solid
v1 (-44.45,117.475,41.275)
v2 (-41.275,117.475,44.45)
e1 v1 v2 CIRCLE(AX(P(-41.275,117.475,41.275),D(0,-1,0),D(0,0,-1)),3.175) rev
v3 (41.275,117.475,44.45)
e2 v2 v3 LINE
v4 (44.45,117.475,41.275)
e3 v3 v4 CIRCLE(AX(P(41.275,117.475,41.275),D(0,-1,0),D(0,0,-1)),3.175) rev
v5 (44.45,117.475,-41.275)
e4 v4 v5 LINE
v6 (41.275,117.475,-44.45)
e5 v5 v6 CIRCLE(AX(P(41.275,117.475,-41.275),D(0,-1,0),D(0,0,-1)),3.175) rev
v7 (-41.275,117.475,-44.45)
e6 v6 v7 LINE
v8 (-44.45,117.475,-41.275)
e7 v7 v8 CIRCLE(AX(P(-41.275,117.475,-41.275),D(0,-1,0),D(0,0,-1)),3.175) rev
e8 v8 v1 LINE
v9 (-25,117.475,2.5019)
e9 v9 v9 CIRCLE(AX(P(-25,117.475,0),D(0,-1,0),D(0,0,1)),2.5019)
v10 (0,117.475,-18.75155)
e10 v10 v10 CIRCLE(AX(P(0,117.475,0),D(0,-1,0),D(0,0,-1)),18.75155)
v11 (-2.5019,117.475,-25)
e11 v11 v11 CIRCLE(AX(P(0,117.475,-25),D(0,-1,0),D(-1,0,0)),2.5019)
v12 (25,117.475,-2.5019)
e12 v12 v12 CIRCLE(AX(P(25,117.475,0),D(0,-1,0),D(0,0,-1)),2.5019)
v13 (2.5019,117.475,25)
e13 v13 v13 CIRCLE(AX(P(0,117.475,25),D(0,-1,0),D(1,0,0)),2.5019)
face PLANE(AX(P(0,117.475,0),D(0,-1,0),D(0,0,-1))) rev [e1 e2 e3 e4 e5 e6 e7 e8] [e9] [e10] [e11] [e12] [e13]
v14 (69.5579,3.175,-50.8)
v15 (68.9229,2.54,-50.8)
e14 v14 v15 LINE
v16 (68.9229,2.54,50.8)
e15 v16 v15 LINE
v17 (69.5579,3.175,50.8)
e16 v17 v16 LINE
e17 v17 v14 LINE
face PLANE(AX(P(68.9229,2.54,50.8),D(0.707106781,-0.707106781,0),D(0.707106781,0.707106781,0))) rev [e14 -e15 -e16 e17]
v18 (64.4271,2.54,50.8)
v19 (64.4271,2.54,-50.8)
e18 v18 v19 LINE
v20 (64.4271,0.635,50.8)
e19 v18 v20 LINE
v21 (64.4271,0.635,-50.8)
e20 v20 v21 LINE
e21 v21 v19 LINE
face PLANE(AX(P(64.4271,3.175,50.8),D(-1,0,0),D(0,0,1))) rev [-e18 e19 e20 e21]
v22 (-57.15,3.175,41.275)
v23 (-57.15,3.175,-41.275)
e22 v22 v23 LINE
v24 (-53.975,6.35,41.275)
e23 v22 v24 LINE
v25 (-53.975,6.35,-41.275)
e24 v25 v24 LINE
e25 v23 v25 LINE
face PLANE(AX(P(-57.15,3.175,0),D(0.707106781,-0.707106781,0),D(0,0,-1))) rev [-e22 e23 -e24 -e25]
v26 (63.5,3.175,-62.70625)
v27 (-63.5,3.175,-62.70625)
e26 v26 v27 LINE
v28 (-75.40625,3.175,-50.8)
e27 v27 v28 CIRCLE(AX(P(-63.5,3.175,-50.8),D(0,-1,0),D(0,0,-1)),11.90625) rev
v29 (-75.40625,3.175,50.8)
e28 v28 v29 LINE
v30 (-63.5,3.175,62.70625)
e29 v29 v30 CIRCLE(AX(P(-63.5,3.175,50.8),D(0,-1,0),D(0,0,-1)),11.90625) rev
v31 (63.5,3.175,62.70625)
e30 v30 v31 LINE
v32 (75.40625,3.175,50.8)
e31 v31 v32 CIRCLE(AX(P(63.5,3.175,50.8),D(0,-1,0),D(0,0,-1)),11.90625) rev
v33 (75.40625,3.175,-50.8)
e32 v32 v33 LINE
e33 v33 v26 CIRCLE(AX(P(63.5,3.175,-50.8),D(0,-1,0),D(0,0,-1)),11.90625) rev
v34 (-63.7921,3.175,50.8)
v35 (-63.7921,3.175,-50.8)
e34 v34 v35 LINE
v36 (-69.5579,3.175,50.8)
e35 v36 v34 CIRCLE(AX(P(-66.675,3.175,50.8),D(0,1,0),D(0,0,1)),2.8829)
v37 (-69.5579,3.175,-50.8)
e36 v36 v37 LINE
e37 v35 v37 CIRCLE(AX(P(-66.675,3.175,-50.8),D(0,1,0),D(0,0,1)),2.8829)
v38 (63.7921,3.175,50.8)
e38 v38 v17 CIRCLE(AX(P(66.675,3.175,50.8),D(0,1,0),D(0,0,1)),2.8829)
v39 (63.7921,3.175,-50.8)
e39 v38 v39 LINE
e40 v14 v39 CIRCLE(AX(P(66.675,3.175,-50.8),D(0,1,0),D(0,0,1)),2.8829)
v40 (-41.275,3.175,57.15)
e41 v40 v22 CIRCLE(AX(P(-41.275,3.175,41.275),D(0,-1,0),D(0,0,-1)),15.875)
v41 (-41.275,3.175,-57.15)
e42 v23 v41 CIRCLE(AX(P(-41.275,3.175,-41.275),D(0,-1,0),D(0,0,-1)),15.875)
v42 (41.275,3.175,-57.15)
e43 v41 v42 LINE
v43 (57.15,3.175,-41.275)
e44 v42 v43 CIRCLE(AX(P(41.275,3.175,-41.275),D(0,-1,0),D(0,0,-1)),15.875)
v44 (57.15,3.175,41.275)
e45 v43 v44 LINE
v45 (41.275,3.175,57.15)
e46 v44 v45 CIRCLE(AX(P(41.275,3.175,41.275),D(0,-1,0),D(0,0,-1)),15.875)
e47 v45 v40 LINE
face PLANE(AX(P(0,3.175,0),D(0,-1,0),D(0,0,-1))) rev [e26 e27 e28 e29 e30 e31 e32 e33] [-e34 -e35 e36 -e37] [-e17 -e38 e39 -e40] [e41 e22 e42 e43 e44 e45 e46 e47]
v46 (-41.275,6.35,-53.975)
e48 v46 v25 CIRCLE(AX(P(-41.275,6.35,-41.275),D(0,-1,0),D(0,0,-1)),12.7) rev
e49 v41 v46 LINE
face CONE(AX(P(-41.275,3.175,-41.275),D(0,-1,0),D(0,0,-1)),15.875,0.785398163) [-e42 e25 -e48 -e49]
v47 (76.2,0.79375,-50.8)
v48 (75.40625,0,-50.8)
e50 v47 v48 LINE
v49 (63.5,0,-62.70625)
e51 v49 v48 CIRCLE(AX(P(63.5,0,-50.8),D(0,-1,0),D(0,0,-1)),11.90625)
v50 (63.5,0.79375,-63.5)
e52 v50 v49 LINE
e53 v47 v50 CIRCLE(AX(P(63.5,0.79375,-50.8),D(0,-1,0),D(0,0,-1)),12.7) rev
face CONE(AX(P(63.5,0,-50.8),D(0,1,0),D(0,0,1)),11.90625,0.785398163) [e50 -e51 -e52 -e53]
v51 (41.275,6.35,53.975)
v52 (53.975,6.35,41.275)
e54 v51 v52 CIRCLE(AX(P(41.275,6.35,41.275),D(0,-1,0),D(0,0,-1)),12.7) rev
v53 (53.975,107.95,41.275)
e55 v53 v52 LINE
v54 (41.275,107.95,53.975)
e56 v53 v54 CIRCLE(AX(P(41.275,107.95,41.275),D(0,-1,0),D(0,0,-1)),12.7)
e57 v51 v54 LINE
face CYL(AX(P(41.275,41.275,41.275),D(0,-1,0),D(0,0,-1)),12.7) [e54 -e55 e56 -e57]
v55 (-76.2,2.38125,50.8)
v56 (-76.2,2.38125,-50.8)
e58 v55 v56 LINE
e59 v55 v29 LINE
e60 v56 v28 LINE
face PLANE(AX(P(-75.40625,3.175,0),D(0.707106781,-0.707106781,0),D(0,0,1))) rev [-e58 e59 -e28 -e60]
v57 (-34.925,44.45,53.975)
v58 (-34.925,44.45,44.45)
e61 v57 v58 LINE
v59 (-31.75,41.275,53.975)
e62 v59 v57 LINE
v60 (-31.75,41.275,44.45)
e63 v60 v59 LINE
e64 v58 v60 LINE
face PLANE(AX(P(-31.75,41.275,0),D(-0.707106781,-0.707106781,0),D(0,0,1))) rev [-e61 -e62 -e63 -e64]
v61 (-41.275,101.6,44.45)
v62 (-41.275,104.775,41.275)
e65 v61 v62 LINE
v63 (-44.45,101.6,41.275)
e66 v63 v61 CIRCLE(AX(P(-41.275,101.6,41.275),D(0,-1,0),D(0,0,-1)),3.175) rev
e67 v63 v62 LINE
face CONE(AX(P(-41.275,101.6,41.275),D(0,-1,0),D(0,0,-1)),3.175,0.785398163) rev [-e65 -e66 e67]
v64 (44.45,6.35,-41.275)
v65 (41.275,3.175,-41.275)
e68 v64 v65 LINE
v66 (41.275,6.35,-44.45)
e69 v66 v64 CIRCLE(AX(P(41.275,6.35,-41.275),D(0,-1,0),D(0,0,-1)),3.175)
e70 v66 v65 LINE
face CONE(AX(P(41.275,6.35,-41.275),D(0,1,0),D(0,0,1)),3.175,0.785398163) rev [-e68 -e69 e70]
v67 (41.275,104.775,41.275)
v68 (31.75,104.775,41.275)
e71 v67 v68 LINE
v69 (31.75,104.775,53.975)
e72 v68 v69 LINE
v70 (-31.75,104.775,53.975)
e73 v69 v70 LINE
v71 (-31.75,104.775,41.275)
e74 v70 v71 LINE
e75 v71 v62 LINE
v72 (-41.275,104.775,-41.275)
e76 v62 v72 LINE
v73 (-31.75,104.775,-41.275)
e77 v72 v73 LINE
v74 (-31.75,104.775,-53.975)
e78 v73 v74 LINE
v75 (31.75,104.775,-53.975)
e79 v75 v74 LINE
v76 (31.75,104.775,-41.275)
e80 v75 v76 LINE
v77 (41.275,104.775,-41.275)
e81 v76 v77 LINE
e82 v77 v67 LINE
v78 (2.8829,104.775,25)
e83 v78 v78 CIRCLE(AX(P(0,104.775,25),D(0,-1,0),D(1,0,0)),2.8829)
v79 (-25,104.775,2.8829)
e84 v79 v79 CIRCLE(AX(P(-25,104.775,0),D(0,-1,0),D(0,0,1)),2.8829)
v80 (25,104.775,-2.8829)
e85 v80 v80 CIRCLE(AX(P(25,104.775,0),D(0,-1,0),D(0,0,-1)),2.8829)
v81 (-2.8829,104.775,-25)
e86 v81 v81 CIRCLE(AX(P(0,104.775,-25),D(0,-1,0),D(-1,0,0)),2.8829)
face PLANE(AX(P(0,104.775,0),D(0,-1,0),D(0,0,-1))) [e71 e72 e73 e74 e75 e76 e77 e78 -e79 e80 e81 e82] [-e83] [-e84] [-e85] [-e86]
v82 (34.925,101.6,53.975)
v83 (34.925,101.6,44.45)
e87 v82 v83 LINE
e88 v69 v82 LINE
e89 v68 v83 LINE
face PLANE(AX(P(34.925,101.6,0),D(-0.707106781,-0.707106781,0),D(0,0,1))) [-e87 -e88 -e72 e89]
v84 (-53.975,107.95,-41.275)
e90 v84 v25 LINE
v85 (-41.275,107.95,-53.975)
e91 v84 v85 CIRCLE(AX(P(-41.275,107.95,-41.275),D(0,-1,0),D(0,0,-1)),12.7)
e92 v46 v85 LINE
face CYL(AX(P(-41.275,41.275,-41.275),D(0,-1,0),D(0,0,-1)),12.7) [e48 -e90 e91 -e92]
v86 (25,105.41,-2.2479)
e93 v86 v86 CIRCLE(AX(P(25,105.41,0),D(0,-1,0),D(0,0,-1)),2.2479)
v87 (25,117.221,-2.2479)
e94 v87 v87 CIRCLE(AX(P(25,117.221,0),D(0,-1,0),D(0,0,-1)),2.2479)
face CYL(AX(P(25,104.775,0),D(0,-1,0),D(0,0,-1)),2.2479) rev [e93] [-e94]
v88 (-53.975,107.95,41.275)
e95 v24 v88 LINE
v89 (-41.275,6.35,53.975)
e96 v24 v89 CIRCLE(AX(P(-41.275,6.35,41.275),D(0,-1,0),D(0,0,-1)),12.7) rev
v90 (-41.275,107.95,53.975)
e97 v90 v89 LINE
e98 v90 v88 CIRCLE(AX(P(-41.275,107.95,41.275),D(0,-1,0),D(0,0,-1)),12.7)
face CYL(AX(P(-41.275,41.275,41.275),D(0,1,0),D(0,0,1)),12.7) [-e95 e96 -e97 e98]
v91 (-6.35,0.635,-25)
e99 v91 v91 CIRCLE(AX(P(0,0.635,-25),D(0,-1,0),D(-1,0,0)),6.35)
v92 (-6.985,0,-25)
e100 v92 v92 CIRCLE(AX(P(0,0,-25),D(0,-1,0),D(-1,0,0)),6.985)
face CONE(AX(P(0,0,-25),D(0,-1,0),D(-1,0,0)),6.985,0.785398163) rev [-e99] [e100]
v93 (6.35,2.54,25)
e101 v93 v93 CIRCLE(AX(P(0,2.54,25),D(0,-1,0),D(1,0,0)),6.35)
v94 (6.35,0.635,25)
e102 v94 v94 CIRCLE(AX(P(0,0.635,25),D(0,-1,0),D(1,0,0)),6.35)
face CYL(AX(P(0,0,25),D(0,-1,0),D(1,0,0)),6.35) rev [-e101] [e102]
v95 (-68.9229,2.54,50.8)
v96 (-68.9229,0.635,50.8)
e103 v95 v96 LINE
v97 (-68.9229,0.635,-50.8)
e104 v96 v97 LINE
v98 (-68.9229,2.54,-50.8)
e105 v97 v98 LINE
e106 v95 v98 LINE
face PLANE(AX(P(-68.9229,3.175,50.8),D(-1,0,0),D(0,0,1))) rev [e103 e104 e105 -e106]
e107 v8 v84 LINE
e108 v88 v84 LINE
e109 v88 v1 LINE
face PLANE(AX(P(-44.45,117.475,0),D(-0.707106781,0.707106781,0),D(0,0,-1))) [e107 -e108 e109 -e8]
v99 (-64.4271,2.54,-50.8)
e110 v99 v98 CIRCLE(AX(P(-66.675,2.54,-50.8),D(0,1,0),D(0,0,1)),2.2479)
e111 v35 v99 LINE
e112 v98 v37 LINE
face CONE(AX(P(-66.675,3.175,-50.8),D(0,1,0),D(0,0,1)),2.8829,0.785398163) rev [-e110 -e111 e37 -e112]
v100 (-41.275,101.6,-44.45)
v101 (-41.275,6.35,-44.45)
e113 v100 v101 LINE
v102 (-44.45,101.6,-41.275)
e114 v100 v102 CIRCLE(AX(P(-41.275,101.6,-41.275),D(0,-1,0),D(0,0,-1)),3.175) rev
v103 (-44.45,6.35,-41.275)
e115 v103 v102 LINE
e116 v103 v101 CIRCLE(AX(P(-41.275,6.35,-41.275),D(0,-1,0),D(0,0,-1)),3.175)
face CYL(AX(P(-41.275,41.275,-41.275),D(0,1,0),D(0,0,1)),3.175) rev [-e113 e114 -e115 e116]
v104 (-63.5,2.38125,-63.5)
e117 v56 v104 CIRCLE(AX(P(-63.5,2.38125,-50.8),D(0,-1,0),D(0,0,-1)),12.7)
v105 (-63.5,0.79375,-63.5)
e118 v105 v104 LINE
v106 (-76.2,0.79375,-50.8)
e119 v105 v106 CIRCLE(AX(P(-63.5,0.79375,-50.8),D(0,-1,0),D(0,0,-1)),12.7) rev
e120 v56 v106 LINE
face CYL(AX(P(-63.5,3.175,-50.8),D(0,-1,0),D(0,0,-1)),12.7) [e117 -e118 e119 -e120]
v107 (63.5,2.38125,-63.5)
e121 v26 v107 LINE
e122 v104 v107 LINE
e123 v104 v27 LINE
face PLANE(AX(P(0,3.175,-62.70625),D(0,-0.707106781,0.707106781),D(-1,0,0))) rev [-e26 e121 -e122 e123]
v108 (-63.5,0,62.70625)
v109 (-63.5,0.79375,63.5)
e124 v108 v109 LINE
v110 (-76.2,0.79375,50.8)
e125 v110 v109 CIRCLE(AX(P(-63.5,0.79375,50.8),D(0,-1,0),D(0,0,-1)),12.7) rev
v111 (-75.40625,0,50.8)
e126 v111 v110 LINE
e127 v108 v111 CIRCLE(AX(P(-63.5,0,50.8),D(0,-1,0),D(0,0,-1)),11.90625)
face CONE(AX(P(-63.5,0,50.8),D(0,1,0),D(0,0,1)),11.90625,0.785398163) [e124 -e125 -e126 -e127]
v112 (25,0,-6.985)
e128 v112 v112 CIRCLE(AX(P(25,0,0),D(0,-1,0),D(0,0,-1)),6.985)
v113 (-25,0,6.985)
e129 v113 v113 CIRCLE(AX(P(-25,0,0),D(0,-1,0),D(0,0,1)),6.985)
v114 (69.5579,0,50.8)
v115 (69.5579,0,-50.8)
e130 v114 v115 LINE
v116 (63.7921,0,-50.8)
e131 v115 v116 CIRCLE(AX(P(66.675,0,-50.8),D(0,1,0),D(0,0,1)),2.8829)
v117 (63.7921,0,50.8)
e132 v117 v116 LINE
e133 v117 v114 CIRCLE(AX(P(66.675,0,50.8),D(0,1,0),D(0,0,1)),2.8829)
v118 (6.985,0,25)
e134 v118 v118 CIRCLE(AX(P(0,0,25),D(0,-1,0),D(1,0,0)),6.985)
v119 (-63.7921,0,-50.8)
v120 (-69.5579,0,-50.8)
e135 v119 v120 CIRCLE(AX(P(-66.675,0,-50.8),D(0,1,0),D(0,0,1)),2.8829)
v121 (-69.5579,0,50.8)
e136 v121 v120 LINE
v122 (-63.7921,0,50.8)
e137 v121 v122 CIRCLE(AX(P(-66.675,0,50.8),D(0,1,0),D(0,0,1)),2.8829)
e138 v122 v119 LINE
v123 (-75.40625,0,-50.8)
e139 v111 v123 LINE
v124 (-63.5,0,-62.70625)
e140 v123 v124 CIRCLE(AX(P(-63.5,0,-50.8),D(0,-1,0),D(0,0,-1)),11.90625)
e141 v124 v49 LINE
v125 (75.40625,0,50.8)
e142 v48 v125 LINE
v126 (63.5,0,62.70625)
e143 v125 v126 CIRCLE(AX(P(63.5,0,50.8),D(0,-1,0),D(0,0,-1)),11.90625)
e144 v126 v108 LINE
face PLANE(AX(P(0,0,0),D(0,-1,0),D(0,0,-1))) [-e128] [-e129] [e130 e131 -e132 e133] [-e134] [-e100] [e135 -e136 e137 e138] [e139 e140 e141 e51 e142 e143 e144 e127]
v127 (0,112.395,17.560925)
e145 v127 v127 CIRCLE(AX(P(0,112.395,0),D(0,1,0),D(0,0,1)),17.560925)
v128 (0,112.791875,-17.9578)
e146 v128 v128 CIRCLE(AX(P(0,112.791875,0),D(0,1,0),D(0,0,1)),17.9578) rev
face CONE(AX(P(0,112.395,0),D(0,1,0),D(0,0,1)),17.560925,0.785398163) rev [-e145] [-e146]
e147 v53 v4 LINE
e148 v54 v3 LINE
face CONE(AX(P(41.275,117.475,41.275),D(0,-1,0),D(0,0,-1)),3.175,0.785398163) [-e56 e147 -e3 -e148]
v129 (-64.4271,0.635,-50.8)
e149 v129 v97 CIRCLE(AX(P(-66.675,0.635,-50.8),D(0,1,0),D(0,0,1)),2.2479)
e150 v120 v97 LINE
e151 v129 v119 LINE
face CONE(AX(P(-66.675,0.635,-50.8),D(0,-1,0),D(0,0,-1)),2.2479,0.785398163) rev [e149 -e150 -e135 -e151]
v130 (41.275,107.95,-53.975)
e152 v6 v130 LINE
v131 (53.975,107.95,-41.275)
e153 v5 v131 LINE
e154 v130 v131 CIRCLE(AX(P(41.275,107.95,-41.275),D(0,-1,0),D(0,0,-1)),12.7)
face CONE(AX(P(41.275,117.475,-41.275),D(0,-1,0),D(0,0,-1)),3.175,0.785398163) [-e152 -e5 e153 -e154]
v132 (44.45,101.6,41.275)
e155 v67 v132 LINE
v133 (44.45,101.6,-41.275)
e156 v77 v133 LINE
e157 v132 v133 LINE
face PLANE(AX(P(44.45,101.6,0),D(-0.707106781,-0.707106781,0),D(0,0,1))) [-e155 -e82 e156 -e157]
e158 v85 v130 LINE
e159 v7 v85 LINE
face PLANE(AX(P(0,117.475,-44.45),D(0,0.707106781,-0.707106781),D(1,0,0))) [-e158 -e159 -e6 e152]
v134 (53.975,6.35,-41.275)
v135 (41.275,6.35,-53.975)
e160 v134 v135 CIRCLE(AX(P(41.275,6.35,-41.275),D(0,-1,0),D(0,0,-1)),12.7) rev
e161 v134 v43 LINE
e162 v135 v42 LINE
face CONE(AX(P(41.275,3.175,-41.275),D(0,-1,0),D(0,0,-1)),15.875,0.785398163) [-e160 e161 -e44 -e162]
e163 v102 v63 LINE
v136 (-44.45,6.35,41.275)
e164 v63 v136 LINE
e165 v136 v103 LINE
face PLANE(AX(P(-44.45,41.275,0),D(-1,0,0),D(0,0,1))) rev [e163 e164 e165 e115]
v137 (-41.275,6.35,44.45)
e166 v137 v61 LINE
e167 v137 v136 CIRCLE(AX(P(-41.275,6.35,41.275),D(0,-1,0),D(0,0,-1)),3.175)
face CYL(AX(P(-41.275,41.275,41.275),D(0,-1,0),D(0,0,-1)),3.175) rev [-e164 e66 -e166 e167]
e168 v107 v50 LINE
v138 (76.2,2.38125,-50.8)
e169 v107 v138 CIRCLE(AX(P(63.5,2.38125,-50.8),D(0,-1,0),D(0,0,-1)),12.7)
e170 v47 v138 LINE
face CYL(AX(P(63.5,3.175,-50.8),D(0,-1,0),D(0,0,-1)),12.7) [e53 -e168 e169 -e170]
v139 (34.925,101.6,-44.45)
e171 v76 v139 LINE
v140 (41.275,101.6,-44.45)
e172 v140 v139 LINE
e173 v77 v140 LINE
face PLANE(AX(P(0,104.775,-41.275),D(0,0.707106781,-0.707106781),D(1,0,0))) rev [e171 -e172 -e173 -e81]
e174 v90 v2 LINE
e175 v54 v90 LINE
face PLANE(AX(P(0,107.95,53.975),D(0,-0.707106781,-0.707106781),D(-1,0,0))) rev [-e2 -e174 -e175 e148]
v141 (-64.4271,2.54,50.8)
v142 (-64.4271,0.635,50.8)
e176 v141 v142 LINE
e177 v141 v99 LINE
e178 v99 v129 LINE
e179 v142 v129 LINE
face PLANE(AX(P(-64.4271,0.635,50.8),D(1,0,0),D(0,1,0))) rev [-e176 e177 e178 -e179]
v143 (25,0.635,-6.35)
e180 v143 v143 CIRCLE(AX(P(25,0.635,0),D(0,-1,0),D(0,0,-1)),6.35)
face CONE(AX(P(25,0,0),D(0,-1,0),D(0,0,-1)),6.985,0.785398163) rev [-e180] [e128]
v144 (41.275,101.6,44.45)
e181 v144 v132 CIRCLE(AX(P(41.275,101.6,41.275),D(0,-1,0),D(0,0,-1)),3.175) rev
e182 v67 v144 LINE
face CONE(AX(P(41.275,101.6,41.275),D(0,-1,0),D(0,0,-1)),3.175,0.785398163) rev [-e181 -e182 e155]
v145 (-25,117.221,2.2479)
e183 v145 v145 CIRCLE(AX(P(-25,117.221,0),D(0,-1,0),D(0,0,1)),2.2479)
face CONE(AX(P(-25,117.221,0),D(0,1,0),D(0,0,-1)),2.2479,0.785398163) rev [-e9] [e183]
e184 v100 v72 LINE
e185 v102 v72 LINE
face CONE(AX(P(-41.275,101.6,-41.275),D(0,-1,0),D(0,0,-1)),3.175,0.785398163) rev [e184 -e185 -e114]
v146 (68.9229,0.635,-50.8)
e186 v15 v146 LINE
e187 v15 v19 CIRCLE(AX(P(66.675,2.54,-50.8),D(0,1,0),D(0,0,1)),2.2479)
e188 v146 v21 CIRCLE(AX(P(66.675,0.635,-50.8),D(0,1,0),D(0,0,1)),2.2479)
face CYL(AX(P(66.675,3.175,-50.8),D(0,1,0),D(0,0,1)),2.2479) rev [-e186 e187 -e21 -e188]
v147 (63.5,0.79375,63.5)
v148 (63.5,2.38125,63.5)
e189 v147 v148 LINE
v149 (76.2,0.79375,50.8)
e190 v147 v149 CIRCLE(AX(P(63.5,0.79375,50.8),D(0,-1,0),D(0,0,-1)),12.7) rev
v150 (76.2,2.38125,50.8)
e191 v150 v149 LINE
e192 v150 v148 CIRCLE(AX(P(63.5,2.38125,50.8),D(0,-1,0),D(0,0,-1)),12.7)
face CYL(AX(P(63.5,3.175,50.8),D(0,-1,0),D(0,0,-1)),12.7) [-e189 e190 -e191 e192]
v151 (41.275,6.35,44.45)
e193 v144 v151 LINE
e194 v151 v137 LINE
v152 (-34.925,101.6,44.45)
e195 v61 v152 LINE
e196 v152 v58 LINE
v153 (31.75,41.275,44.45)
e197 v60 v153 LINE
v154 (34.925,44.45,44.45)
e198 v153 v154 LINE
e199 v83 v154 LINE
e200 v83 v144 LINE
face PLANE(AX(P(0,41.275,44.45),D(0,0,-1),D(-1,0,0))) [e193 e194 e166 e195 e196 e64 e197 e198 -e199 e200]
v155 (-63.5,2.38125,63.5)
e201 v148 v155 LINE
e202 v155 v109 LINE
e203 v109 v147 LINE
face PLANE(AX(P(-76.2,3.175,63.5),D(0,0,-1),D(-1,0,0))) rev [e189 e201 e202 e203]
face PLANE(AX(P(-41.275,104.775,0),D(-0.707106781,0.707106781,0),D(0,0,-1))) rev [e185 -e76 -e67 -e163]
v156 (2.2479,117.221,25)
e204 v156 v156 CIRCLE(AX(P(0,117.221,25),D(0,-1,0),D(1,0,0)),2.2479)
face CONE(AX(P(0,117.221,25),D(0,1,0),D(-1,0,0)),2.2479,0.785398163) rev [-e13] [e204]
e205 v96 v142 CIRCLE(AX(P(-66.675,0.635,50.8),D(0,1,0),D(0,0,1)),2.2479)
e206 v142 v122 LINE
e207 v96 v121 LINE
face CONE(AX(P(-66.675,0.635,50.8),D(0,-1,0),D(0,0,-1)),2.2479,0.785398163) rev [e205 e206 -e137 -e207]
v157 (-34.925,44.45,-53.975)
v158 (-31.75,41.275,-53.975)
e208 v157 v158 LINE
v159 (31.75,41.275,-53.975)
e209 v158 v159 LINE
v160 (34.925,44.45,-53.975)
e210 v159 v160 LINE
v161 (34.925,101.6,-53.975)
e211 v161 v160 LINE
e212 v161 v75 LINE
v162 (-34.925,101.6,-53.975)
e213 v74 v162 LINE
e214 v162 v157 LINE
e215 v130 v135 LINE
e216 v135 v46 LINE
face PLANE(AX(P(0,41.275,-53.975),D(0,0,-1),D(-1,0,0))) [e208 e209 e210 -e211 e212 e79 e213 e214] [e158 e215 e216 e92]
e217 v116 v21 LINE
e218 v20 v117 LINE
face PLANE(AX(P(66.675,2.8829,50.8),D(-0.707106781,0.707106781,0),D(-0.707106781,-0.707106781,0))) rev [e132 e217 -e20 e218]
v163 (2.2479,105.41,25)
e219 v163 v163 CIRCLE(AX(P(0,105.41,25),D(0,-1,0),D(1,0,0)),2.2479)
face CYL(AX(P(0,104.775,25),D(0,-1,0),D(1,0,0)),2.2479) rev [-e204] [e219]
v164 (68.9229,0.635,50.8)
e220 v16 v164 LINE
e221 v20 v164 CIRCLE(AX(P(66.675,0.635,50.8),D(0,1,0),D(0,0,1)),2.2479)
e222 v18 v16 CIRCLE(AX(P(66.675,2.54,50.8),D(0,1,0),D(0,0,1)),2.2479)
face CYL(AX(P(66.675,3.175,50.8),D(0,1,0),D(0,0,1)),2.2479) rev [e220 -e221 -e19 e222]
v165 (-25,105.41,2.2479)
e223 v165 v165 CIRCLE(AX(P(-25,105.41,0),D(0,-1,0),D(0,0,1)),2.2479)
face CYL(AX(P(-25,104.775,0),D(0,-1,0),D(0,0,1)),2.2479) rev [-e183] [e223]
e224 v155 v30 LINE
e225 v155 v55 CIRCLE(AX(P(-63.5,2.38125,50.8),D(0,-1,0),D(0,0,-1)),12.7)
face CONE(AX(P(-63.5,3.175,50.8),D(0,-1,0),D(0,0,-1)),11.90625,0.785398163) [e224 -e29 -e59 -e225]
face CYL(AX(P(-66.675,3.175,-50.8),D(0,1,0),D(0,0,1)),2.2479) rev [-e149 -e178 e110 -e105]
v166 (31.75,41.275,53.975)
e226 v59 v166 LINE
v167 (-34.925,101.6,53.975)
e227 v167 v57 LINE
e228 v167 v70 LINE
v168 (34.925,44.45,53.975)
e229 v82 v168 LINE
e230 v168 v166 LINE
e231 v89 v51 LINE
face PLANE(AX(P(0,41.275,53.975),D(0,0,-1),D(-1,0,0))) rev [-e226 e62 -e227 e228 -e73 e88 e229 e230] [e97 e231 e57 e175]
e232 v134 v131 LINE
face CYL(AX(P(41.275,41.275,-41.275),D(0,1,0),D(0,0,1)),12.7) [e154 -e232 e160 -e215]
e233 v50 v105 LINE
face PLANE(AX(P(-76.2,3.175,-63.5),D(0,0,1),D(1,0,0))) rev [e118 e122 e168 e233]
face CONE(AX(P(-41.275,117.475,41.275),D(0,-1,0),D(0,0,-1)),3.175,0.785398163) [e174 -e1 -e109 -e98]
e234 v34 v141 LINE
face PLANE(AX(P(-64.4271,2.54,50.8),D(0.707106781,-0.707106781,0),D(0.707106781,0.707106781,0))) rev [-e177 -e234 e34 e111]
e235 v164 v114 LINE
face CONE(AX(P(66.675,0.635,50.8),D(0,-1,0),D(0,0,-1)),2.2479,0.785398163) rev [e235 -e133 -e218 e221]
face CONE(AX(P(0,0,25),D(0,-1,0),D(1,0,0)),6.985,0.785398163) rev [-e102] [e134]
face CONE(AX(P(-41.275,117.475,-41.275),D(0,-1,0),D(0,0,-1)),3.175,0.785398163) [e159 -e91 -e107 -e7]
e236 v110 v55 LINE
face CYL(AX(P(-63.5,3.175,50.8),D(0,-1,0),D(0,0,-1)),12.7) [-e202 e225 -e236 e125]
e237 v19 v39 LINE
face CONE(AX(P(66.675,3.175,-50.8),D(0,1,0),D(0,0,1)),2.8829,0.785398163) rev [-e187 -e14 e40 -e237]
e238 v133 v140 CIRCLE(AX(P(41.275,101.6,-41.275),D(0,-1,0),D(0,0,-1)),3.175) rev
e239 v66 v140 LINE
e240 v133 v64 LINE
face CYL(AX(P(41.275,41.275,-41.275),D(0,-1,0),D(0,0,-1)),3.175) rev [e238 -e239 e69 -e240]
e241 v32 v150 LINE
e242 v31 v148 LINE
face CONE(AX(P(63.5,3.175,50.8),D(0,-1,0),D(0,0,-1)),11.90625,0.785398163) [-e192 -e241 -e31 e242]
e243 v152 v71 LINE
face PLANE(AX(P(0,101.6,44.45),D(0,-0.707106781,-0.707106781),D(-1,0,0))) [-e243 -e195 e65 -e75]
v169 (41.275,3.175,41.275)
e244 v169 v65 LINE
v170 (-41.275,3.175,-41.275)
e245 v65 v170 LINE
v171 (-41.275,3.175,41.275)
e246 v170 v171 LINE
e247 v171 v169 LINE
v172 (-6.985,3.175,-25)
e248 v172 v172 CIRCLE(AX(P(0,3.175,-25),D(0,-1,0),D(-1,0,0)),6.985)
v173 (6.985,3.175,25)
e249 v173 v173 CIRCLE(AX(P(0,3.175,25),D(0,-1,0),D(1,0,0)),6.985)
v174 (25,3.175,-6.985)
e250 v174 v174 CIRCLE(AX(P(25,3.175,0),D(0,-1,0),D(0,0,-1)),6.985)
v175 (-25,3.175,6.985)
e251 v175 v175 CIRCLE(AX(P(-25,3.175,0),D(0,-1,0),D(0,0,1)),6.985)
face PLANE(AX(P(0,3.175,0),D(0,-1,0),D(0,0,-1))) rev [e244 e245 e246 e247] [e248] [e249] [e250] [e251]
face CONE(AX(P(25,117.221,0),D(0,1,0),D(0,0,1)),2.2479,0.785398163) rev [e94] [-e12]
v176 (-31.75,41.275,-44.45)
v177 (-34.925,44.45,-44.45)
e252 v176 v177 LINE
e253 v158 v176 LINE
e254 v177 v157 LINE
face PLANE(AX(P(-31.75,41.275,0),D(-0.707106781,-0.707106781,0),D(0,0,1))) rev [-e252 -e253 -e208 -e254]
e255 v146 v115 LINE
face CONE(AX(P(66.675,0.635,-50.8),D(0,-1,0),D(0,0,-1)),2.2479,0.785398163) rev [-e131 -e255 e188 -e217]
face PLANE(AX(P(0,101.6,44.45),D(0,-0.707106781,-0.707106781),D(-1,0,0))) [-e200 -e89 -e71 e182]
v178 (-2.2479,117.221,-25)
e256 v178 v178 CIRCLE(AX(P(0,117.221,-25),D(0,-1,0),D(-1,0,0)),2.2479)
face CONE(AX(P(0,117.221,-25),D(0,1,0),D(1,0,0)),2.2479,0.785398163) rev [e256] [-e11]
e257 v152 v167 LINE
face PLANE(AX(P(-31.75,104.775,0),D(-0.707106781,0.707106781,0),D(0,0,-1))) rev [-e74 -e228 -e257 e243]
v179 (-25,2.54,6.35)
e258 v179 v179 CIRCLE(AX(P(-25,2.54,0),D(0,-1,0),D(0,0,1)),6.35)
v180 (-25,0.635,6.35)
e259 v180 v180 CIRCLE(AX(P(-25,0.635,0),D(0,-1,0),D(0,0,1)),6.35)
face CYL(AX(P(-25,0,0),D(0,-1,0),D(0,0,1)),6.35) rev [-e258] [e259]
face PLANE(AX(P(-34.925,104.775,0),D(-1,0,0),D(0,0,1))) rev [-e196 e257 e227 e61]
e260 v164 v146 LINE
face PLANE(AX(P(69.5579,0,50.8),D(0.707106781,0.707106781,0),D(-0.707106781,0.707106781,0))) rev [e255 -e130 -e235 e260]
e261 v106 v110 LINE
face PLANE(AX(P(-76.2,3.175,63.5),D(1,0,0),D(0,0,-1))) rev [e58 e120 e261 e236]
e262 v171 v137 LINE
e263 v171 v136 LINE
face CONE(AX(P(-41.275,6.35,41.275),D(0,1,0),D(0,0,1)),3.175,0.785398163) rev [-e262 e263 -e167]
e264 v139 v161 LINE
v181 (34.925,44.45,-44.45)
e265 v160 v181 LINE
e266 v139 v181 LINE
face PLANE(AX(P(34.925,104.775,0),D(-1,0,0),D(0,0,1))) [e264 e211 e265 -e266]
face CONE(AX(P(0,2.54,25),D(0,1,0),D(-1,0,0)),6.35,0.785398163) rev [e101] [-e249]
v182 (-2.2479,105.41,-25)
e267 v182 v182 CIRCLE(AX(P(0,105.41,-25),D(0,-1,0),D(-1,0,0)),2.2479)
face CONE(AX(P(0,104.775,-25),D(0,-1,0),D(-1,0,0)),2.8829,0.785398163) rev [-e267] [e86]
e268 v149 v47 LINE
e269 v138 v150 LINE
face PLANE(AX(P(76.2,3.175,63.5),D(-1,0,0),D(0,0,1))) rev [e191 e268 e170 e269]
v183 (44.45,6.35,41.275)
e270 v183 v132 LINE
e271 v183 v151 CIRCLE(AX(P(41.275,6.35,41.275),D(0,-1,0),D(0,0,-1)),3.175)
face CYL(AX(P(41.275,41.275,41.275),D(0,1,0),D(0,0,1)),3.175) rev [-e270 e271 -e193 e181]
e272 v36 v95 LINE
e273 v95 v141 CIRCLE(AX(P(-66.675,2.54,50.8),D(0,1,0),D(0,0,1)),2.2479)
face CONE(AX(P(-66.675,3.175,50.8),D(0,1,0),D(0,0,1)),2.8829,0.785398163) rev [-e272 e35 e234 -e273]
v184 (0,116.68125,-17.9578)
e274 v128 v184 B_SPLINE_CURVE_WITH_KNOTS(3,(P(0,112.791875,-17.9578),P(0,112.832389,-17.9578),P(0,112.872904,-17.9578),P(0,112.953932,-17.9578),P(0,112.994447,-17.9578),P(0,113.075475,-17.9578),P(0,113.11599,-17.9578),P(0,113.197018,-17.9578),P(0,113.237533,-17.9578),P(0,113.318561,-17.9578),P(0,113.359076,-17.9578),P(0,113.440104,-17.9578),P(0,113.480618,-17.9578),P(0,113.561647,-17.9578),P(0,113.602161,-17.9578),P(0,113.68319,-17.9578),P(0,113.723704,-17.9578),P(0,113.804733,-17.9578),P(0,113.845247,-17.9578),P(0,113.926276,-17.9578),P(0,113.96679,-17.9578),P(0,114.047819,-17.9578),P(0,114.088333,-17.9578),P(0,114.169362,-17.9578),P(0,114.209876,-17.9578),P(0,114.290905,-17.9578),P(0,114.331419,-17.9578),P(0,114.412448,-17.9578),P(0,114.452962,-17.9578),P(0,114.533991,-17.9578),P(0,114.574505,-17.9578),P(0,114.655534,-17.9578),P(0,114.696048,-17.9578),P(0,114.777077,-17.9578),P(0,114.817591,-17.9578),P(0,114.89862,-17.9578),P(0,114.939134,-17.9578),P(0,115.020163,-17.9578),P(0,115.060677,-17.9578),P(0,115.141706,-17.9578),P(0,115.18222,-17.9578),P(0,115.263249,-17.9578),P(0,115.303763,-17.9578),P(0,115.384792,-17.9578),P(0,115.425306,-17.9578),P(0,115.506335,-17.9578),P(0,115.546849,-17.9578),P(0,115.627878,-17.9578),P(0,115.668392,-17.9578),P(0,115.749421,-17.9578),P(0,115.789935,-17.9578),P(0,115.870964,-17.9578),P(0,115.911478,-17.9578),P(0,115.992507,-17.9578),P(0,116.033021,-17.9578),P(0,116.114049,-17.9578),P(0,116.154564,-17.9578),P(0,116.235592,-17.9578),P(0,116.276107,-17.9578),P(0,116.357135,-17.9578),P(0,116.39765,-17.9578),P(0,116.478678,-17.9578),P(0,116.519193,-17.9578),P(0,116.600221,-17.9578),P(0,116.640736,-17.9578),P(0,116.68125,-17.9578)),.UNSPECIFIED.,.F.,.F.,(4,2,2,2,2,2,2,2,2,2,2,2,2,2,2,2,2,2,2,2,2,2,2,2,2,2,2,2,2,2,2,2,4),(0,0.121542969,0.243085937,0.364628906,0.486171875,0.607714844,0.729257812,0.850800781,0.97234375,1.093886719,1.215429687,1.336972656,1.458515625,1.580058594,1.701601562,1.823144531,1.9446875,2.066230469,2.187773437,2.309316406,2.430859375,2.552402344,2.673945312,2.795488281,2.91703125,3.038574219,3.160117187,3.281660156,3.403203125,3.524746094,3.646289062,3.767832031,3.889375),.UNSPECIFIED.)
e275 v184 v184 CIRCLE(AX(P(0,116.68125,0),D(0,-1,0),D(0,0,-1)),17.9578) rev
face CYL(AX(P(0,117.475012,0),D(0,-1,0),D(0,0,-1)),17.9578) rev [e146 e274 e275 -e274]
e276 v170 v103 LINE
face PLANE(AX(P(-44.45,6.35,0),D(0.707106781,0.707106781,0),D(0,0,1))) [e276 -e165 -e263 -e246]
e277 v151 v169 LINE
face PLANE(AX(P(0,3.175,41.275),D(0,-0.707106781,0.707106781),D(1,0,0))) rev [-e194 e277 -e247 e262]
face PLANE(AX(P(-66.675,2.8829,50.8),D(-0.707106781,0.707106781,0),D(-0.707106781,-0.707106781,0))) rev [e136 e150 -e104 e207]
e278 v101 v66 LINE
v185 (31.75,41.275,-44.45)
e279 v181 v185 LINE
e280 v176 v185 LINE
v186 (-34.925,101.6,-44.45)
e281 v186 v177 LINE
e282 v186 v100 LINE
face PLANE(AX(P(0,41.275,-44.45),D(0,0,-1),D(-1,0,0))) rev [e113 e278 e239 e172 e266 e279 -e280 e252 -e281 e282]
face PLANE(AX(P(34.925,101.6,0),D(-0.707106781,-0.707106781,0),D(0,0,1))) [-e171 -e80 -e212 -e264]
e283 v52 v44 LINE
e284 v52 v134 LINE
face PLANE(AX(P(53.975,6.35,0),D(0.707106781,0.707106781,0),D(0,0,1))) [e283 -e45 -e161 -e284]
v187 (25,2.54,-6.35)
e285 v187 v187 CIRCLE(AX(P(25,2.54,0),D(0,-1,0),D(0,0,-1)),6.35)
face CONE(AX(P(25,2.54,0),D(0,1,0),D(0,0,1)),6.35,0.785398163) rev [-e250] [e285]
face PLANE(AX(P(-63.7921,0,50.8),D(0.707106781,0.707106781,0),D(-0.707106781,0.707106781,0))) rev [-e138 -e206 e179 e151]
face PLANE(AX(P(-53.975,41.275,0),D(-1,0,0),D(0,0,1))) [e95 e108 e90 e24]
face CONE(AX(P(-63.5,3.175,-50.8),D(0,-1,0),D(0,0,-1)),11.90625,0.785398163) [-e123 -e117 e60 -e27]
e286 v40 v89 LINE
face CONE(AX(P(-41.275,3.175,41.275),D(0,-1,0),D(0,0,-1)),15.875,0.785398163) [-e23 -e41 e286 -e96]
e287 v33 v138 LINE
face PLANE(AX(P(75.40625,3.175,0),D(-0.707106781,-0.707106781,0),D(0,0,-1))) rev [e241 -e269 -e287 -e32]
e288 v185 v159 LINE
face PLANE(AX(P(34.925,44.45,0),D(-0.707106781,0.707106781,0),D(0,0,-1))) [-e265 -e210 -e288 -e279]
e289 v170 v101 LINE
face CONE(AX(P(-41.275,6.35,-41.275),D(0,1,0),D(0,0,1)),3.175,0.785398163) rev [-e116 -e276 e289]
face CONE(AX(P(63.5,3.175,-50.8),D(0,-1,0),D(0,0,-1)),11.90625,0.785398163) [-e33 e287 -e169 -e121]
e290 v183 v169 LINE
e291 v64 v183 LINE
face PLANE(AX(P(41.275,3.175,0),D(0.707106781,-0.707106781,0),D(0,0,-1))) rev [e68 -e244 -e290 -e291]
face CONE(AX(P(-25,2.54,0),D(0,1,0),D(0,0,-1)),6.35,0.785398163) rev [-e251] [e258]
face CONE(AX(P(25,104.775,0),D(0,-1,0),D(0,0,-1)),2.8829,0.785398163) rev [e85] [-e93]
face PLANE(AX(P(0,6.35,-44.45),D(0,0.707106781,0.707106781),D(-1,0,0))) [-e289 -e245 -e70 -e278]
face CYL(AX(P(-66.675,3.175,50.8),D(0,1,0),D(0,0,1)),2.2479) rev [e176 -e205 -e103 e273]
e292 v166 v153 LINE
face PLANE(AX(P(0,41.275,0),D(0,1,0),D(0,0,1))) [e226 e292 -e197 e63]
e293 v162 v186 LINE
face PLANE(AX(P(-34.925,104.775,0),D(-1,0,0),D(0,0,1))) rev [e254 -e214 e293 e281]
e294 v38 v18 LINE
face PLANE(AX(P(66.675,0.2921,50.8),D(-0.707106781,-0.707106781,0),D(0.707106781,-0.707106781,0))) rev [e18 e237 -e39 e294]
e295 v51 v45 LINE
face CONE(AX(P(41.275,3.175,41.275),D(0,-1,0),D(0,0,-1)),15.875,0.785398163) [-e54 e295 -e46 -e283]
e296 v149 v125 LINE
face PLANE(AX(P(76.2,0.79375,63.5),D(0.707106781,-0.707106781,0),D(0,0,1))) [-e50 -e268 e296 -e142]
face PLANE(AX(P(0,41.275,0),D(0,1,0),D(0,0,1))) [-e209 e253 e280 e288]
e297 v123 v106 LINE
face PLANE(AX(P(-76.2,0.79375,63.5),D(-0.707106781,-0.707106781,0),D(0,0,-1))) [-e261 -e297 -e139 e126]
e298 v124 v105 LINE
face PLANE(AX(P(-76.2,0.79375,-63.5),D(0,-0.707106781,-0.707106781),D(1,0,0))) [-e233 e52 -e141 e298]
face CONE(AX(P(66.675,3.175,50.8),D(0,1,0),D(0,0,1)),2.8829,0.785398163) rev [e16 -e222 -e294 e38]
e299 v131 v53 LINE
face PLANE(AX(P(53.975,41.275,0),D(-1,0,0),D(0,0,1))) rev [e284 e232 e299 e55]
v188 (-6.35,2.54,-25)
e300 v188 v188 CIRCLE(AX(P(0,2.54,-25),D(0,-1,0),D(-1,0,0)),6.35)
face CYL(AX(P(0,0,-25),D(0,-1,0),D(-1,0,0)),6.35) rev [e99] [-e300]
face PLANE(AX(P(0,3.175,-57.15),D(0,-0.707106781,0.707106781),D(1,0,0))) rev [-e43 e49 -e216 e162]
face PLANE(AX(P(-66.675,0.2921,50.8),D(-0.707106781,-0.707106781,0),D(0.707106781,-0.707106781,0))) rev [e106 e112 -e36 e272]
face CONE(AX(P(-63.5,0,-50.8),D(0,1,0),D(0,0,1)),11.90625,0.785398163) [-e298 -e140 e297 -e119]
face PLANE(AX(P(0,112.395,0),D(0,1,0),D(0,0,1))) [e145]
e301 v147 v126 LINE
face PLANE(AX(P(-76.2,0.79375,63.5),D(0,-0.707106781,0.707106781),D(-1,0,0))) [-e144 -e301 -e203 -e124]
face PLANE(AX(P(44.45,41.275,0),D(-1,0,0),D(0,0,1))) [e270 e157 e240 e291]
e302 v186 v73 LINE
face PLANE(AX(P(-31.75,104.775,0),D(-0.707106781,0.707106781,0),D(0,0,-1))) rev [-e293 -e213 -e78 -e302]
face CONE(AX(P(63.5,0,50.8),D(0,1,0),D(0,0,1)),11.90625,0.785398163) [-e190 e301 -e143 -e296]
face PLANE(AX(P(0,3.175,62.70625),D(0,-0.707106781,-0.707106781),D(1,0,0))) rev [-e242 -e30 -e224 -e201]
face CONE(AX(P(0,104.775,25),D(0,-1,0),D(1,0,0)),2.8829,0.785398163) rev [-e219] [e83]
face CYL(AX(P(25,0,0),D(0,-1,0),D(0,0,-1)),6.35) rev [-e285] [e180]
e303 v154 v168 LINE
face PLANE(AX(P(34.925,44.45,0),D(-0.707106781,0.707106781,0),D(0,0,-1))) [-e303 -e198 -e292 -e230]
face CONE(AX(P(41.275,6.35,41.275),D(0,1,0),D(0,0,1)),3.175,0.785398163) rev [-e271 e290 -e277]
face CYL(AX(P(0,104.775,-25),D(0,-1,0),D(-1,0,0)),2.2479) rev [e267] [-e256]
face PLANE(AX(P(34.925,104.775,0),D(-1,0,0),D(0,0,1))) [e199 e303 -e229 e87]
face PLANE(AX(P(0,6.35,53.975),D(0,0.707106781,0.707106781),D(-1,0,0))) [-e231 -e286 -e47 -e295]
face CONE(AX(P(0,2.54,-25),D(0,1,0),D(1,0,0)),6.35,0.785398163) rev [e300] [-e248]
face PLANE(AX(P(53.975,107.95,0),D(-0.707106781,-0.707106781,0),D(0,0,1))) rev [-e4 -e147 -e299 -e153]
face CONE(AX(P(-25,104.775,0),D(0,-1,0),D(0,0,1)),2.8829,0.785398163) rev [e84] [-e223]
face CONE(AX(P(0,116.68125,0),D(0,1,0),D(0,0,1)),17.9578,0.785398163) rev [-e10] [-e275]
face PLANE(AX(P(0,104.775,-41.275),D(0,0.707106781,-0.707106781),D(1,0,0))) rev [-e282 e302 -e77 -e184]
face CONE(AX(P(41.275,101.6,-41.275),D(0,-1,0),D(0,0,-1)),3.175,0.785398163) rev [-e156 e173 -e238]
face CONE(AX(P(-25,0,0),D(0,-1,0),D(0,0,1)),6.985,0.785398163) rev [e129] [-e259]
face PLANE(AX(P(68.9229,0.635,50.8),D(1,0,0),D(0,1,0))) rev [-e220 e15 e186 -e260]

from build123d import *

# Parameters (mm, degrees)
SKETCH1_W                   = 152.4
SKETCH1_H                   = 127
BOSS_EXTRUDE1_DEPTH         = 3.175
SKETCH2_W                   = 69.85
SKETCH2_H                   = 9.525
BOSS_EXTRUDE2_DEPTH         = 38.1
BOSS_EXTRUDE3_DEPTH         = 101.6
BOSS_EXTRUDE4_START         = 101.6
SKETCH2_4_W                 = 69.85
SKETCH2_4_H                 = 9.525
SKETCH2_4_W_2               = 88.9
SKETCH2_4_H_2               = 88.9
BOSS_EXTRUDE4_DEPTH         = 12.7
CUT_EXTRUDE1_DEPTH          = 154.750010163
CUT_EXTRUDE1_DEPTH_BACK     = 5.08
SKETCH7_R                   = 17.9578
F_8_START                   = -50.8
F_8_CLEARANCE_SLOT1_2_DEPTH = 101.6
CIRPATTERN1_COUNT           = 4
FILLET2_R                   = 3.175
FILLET1_R                   = 12.7
CHAMFER1_SIZE               = 3.175
CHAMFER2_SIZE               = 9.525
CHAMFER4_SIZE               = 3.175
CHAMFER3_SIZE               = 0.79375
CHAMFER5_SIZE               = 0.79375
CHAMFER6_SIZE               = 0.396875


with BuildPart() as part:
    # Sketch1 → Boss-Extrude1 (new body)
    with BuildSketch(Plane(origin=(0, 0, 0), x_dir=(1, 0, 0), z_dir=(0, 1, 0))):
        Rectangle(SKETCH1_W, SKETCH1_H)
    extrude(amount=BOSS_EXTRUDE1_DEPTH)

    # Sketch2 → Boss-Extrude2 (add)
    with BuildSketch(Plane(origin=(0, 3.175, 0), x_dir=(1, 0, 0), z_dir=(0, 1, 0))):
        Polygon((-34.925, 53.975), (-53.975, 53.975), (-53.975, -53.975), (-34.925, -53.975), (-34.925, -44.45), (-44.45, -44.45), (-44.45, 44.45), (-34.925, 44.45), align=None)
        with Locations((0, 49.2125)):
            Rectangle(SKETCH2_W, SKETCH2_H)
        Polygon((53.975, 53.975), (34.925, 53.975), (34.925, 44.45), (44.45, 44.45), (44.45, -44.45), (34.925, -44.45), (34.925, -53.975), (53.975, -53.975), align=None)
        with Locations((0, -49.2125)):
            Rectangle(SKETCH2_W, SKETCH2_H)
    extrude(amount=BOSS_EXTRUDE2_DEPTH)

    # Sketch2<3> → Boss-Extrude3 (add)
    with BuildSketch(Plane(origin=(0, 3.175, 0), x_dir=(1, 0, 0), z_dir=(0, 1, 0))):
        Polygon((-34.925, 53.975), (-53.975, 53.975), (-53.975, -53.975), (-34.925, -53.975), (-34.925, -44.45), (-44.45, -44.45), (-44.45, 44.45), (-34.925, 44.45), align=None)
        Polygon((53.975, 53.975), (34.925, 53.975), (34.925, 44.45), (44.45, 44.45), (44.45, -44.45), (34.925, -44.45), (34.925, -53.975), (53.975, -53.975), align=None)
    extrude(amount=BOSS_EXTRUDE3_DEPTH)

    # Sketch2<4> → Boss-Extrude4 (add)
    with BuildSketch(Plane(origin=(0, 3.175, 0), x_dir=(1, 0, 0), z_dir=(0, 1, 0)).offset(BOSS_EXTRUDE4_START)):
        with Locations((0, 49.2125)):
            Rectangle(SKETCH2_4_W, SKETCH2_4_H)
        Polygon((-34.925, 53.975), (-53.975, 53.975), (-53.975, -53.975), (-34.925, -53.975), (-34.925, -44.45), (-44.45, -44.45), (-44.45, 44.45), (-34.925, 44.45), align=None)
        with Locations((0, -49.2125)):
            Rectangle(SKETCH2_4_W, SKETCH2_4_H)
        Polygon((53.975, 53.975), (34.925, 53.975), (34.925, 44.45), (44.45, 44.45), (44.45, -44.45), (34.925, -44.45), (34.925, -53.975), (53.975, -53.975), align=None)
        Rectangle(SKETCH2_4_W_2, SKETCH2_4_H_2)
    extrude(amount=BOSS_EXTRUDE4_DEPTH)

    # Sketch7 → Cut-Extrude1 (cut, two sides: drawn at the far end of the back side and taken through both)
    with BuildSketch(Plane(origin=(0, 117.475, 0), x_dir=(1, 0, 0), z_dir=(0, 1, 0)).offset(-CUT_EXTRUDE1_DEPTH_BACK)):
        with Locations(Location((0, 0, 0), (0, 0, 90))):
            Circle(SKETCH7_R)
    extrude(amount=CUT_EXTRUDE1_DEPTH + CUT_EXTRUDE1_DEPTH_BACK, mode=Mode.SUBTRACT)

    # #8 Clearance Slot1: read off the stored shape, not the designer's step
    # #8 Clearance Slot1 outline → #8 Clearance Slot1 (revolve, cut)
    with BuildSketch(Plane(origin=(66.675, 0, -50.8), x_dir=(1, 0, 0), z_dir=(0, 0, 1))):
        Polygon((0, 0), (2.8829, 0), (2.2479, 0.635), (2.2479, 2.54), (2.8829, 3.175), (0, 3.175), align=None)
    revolve(axis=Axis((66.675, 0, -50.8), (0, 1, 0)), mode=Mode.SUBTRACT)

    # 8 Clearance Slot1 2 outline → 8 Clearance Slot1 2 (cut)
    with BuildSketch(Plane.XY.offset(F_8_START)):
        Polygon((69.5579, 3.175), (63.7921, 3.175), (64.4271, 2.54), (64.4271, 0.635), (63.7921, 0), (69.5579, 0), (68.9229, 0.635), (68.9229, 2.54), align=None)
        Polygon((-64.4271, 2.54), (-63.7921, 3.175), (-69.5579, 3.175), (-68.9229, 2.54), (-68.9229, 0.635), (-69.5579, 0), (-63.7921, 0), (-64.4271, 0.635), align=None)
    extrude(amount=F_8_CLEARANCE_SLOT1_2_DEPTH, mode=Mode.SUBTRACT)

    # 8 Clearance Slot1 3 outline → 8 Clearance Slot1 3 (revolve, cut)
    with BuildSketch(Plane(origin=(66.675, 0, 50.8), x_dir=(1, 0, 0), z_dir=(0, 0, 1))):
        Polygon((0, 0), (2.8829, 0), (2.2479, 0.635), (2.2479, 2.54), (2.8829, 3.175), (0, 3.175), align=None)
    revolve(axis=Axis((66.675, 0, 50.8), (0, 1, 0)), mode=Mode.SUBTRACT)

    # 8 Clearance Slot1 4 outline → 8 Clearance Slot1 4 (revolve, cut)
    with BuildSketch(Plane(origin=(-66.675, 0, -50.8), x_dir=(1, 0, 0), z_dir=(0, 0, 1))):
        Polygon((0, 0), (2.8829, 0), (2.2479, 0.635), (2.2479, 2.54), (2.8829, 3.175), (0, 3.175), align=None)
    revolve(axis=Axis((-66.675, 0, -50.8), (0, 1, 0)), mode=Mode.SUBTRACT)

    # 8 Clearance Slot1 5 outline → 8 Clearance Slot1 5 (revolve, cut)
    with BuildSketch(Plane(origin=(-66.675, 0, 50.8), x_dir=(1, 0, 0), z_dir=(0, 0, 1))):
        Polygon((0, 0), (2.8829, 0), (2.2479, 0.635), (2.2479, 2.54), (2.8829, 3.175), (0, 3.175), align=None)
    revolve(axis=Axis((-66.675, 0, 50.8), (0, 1, 0)), mode=Mode.SUBTRACT)

    # Sketch11 → 1/2 (0.5) Diameter Hole1 (revolve, cut)
    with BuildSketch(Plane(origin=(25, 0, 0), x_dir=(0, 0, -1), z_dir=(1, 0, 0))):
        Polygon((0, 0), (0, 3.175), (6.985, 3.175), (6.35, 2.54), (6.35, 0.635), (6.985, 0), align=None)
    f_1_2_0_5_diameter_hole1 = revolve(axis=Axis((25, -6.35, 0), (0, 1, 0)), mode=Mode.SUBTRACT)

    # Sketch13 → #8 Clearance Hole2 (revolve, cut)
    with BuildSketch(Plane(origin=(25, 104.775, 0), x_dir=(0, 0, -1), z_dir=(1, 0, 0))):
        Polygon((0, 0), (0, 12.7), (2.5019, 12.7), (2.2479, 12.446), (2.2479, 0.635), (2.8829, 0), align=None)
    f_8_clearance_hole2 = revolve(axis=Axis((25, 98.425, 0), (0, 1, 0)), mode=Mode.SUBTRACT)

    # CirPattern1: 1/2 (0.5) Diameter Hole1, #8 Clearance Hole2 ×4 about axis
    cirpattern1_axis = Axis((0, 0, 0), (0, 1, 0))
    add([f_1_2_0_5_diameter_hole1.rotate(cirpattern1_axis, i * 360 / CIRPATTERN1_COUNT) for i in range(1, CIRPATTERN1_COUNT)], mode=Mode.SUBTRACT)
    add([f_8_clearance_hole2.rotate(cirpattern1_axis, i * 360 / CIRPATTERN1_COUNT) for i in range(1, CIRPATTERN1_COUNT)], mode=Mode.SUBTRACT)

    # Fillet2
    fillet2_edges = [part.edges().sort_by_distance(p)[0] for p in [
        (-44.45, 53.975, -44.45),
        (44.45, 53.975, -44.45),
        (44.45, 53.975, 44.45),
        (-44.45, 53.975, 44.45),
    ]]
    fillet(fillet2_edges, radius=FILLET2_R)

    # Fillet1
    fillet1_edges = [part.edges().sort_by_distance(p)[0] for p in [
        (53.975, 60.325, 53.975),
        (53.975, 60.325, -53.975),
        (-53.975, 60.325, -53.975),
        (-53.975, 60.325, 53.975),
        (76.2, 1.5875, 63.5),
        (-76.2, 1.5875, 63.5),
        (-76.2, 1.5875, -63.5),
        (76.2, 1.5875, -63.5),
    ]]
    fillet(fillet1_edges, radius=FILLET1_R)

    # Chamfer1
    chamfer1_edges = [part.edges().sort_by_distance(p)[0] for p in [
        (0, 3.175, -44.45),
        (-44.45, 3.175, 0),
        (0, 3.175, 44.45),
        (44.45, 3.175, 0),
        (43.52006403, 3.175, 43.52006403),
        (-43.52006403, 3.175, 43.52006403),
        (43.52006403, 3.175, -43.52006403),
        (-43.52006403, 3.175, -43.52006403),
        (53.975, 3.175, 0),
        (0, 3.175, 53.975),
        (-53.975, 3.175, 0),
        (0, 3.175, -53.975),
        (-50.255256121, 3.175, -50.255256121),
        (50.255256121, 3.175, -50.255256121),
        (50.255256121, 3.175, 50.255256121),
        (-50.255256121, 3.175, 50.255256121),
    ]]
    chamfer(chamfer1_edges, length=CHAMFER1_SIZE)

    # Chamfer2
    chamfer2_edges = [part.edges().sort_by_distance(p)[0] for p in [
        (-53.975, 117.475, 0),
        (0, 117.475, -53.975),
        (0, 117.475, 53.975),
        (53.975, 117.475, 0),
        (-50.255256121, 117.475, 50.255256121),
        (50.255256121, 117.475, 50.255256121),
        (50.255256121, 117.475, -50.255256121),
        (-50.255256121, 117.475, -50.255256121),
    ]]
    chamfer(chamfer2_edges, length=CHAMFER2_SIZE)

    # Chamfer4
    chamfer4_edges = [part.edges().sort_by_distance(p)[0] for p in [
        (-38.1, 104.775, -44.45),
        (-44.45, 104.775, 0),
        (44.45, 104.775, 0),
        (-38.1, 104.775, 44.45),
        (43.52006403, 104.775, 43.52006403),
        (-43.52006403, 104.775, 43.52006403),
        (43.52006403, 104.775, -43.52006403),
        (-43.52006403, 104.775, -43.52006403),
        (-34.925, 41.275, 49.2125),
        (-34.925, 41.275, -49.2125),
        (-34.925, 104.775, -49.2125),
        (-34.925, 104.775, 49.2125),
        (34.925, 41.275, -49.2125),
        (34.925, 104.775, -49.2125),
        (38.1, 104.775, 44.45),
        (34.925, 41.275, 49.2125),
        (34.925, 104.775, 49.2125),
        (38.1, 104.775, -44.45),
    ]]
    chamfer(chamfer4_edges, length=CHAMFER4_SIZE)

    # Chamfer3
    chamfer3_edges = [part.edges().sort_by_distance(p)[0] for p in [
        (0, 0, -63.5),
        (0, 3.175, -63.5),
        (76.2, 0, 0),
        (0, 0, 63.5),
        (-76.2, 0, 0),
        (72.480256121, 0, 59.780256121),
        (-72.480256121, 0, 59.780256121),
        (-72.480256121, 0, -59.780256121),
        (72.480256121, 0, -59.780256121),
        (76.2, 3.175, 0),
        (-76.2, 3.175, 0),
        (0, 3.175, 63.5),
        (72.480256121, 3.175, 59.780256121),
        (-72.480256121, 3.175, 59.780256121),
        (-72.480256121, 3.175, -59.780256121),
        (72.480256121, 3.175, -59.780256121),
    ]]
    chamfer(chamfer3_edges, length=CHAMFER3_SIZE)

    # Chamfer5
    chamfer5_edges = [part.edges().sort_by_distance(p)[0] for p in [
        (0, 117.475, 17.9578),
    ]]
    chamfer(chamfer5_edges, length=CHAMFER5_SIZE)

    # Chamfer6
    chamfer6_edges = [part.edges().sort_by_distance(p)[0] for p in [
        (0, 112.395, 17.9578),
    ]]
    chamfer(chamfer6_edges, length=CHAMFER6_SIZE)


solid = part.part
